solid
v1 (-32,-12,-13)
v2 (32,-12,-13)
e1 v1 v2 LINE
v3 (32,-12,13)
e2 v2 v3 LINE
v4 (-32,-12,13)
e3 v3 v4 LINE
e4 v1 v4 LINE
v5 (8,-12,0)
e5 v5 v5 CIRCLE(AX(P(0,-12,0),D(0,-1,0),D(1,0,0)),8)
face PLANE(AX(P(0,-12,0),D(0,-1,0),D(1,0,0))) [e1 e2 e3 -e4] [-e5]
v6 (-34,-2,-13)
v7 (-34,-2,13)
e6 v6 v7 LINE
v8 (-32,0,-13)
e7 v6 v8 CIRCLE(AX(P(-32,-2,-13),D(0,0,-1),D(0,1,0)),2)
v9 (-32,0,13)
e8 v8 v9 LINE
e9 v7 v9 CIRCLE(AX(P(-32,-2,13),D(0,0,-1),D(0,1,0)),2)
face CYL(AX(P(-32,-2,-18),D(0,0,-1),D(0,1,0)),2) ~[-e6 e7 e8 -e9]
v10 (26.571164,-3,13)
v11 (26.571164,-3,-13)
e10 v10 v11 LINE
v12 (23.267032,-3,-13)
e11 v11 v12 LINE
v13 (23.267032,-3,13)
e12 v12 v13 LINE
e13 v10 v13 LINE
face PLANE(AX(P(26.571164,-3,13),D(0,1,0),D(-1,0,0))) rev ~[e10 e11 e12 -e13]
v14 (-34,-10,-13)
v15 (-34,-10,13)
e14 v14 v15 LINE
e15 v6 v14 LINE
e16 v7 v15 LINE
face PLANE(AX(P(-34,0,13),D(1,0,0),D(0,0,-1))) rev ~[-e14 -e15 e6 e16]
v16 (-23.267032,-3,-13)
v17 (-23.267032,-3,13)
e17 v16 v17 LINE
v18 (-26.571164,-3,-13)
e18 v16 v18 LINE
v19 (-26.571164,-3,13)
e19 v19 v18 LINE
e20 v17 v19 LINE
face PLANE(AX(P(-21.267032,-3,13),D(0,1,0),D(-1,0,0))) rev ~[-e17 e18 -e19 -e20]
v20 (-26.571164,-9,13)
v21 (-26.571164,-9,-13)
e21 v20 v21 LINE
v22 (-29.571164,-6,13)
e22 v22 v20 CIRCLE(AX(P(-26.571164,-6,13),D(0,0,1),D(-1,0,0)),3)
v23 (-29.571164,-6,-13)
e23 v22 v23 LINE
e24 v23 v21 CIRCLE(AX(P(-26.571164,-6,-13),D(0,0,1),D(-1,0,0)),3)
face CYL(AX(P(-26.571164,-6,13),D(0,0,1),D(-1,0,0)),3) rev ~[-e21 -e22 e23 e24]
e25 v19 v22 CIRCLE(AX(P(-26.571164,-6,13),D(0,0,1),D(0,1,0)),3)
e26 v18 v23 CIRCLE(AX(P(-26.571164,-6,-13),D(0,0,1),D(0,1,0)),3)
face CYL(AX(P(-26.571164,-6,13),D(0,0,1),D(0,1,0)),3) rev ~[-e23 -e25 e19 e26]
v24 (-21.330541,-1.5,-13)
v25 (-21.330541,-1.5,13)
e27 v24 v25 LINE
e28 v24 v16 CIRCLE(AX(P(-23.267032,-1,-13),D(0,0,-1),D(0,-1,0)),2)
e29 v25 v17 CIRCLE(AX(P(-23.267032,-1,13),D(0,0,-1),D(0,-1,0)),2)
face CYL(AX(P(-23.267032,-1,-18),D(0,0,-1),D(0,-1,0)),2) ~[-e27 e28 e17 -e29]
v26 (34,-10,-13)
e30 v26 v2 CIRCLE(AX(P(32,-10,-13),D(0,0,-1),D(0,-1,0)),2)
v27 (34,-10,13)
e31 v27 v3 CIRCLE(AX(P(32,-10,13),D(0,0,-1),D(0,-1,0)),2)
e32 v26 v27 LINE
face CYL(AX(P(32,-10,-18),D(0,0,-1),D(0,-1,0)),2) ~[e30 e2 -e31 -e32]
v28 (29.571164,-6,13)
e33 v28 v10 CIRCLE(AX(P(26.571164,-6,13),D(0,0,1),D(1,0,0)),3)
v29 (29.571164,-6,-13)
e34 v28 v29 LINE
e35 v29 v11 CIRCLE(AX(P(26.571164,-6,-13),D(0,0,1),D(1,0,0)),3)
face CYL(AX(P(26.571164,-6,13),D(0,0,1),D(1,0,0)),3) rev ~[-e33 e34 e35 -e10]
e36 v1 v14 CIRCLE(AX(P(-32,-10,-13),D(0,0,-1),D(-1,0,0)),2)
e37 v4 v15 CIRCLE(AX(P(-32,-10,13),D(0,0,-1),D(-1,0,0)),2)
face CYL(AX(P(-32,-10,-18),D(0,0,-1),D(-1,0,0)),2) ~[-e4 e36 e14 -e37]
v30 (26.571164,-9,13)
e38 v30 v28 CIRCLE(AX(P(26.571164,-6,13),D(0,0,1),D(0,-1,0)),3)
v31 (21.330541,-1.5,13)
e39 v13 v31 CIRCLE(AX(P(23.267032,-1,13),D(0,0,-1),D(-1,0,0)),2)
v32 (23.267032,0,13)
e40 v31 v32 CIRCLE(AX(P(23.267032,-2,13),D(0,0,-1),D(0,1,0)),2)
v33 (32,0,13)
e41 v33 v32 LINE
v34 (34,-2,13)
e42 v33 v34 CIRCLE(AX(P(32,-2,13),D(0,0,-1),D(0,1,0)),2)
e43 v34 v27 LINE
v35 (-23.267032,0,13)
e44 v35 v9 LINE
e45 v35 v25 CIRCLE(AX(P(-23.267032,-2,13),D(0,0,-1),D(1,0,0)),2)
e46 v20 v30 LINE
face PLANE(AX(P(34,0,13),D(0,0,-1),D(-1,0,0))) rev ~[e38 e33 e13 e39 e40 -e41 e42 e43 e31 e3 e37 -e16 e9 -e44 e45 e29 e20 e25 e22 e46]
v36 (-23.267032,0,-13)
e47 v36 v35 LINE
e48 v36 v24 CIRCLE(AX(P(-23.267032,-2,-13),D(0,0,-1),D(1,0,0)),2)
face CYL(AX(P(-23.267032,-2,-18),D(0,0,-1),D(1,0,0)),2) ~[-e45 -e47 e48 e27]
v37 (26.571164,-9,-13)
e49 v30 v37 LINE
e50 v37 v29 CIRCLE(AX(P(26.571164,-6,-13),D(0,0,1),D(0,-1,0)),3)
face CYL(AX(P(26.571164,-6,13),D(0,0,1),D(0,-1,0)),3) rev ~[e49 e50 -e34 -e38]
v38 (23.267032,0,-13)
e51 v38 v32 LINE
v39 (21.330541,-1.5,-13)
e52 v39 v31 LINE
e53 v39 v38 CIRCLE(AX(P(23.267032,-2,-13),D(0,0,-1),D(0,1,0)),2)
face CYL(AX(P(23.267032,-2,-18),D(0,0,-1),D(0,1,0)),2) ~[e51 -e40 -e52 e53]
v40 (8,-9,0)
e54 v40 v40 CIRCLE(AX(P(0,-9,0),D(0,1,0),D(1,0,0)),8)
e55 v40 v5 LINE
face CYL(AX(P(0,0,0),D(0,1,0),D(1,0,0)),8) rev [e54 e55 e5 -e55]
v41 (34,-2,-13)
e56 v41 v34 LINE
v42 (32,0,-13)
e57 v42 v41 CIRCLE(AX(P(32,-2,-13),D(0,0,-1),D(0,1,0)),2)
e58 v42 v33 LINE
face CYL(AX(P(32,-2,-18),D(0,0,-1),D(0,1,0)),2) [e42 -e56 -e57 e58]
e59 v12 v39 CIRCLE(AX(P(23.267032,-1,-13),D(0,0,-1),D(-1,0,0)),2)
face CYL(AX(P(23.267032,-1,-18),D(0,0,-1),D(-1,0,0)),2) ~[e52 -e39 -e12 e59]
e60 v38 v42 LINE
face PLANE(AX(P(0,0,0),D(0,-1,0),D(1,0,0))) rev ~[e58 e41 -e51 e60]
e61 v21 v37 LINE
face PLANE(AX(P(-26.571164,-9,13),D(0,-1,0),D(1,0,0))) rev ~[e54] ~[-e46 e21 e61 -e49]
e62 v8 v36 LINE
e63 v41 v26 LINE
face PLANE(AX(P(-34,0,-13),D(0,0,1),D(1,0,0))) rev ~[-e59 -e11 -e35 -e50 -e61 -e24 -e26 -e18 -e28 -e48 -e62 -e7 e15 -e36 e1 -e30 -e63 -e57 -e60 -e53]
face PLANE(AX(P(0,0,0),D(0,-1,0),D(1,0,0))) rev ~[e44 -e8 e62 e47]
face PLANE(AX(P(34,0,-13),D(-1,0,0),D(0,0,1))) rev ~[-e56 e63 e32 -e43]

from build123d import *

# Parameters (mm, degrees)
F0_R        = 8
F1_DEPTH    = 12
F3_DEPTH    = 40
F4_T1_DEPTH = 36


# Not quite as in the source:
# - a fillet or chamfer that OpenCascade refuses, or shapes differently, is made with other operations: its cross-section is extruded or revolved along the edge and cut away or added
# - a feature names something its author has since deleted; it is built from what else it names


with BuildPart() as f1:
    # F0 (on Front) → F1 (new body)
    with BuildSketch(Plane.XZ):
        Polygon((34, 13), (-34, 13), (-34, 0), (-34, -13), (34, -13), align=None)
        Circle(F0_R, mode=Mode.SUBTRACT)
    extrude(amount=F1_DEPTH)

    # F2 (on face) → F3 (cut)
    with BuildSketch(Plane.XY.offset(13)):
        with BuildLine():
            Line((-21.2670322508, -3), (-26.5711637536, -3))
            ThreePointArc((-26.5711637536, -3), (-28.6924840972, -3.8786796564), (-29.5711637536, -6))
            ThreePointArc((-29.5711637536, -6), (-28.6924840972, -8.1213203436), (-26.5711637536, -9))
            Line((-26.5711637536, -9), (26.5711637536, -9))
            ThreePointArc((26.5711637536, -9), (28.6924840972, -8.1213203436), (29.5711637536, -6))
            ThreePointArc((29.5711637536, -6), (28.6924840972, -3.8786796564), (26.5711637536, -3))
            Line((26.5711637536, -3), (21.2670322508, -3))
            Line((21.2670322508, -3), (21.2670322508, 0))
            Line((21.2670322508, 0), (0, 0))
            Line((0, 0), (-21.2670322508, 0))
            Line((-21.2670322508, 0), (-21.2670322508, -3))
        make_face()
    extrude(amount=-F3_DEPTH, mode=Mode.SUBTRACT)

    # F4: fillet of radius 2 on 8 edges, made by hand

    # F4_s2 → F4_t1 (cut)
    with BuildSketch(Plane.XY.offset(-18)):
        with BuildLine():
            ThreePointArc((32, -12), (33.4142135624, -11.4142135624), (34, -10))
            Line((34, -10), (34, -12))
            Line((34, -12), (32, -12))
        make_face()
        with BuildLine():
            ThreePointArc((32, 0), (33.4142135624, -0.5857864376), (34, -2))
            Line((34, -2), (34, 0))
            Line((34, 0), (32, 0))
        make_face()
        with BuildLine():
            ThreePointArc((-21.2670322508, -2), (-21.8528186884, -0.5857864376), (-23.2670322508, 0))
            Line((-23.2670322508, 0), (-21.2670322508, 0))
            Line((-21.2670322508, 0), (-21.2670322508, -2))
        make_face()
        with BuildLine():
            ThreePointArc((23.2670322508, 0), (21.8528186884, -0.5857864376), (21.2670322508, -2))
            Line((21.2670322508, -2), (21.2670322508, 0))
            Line((21.2670322508, 0), (23.2670322508, 0))
        make_face()
        with BuildLine():
            ThreePointArc((-32, 0), (-33.4142135624, -0.5857864376), (-34, -2))
            Line((-34, -2), (-34, 0))
            Line((-34, 0), (-32, 0))
        make_face()
        with BuildLine():
            ThreePointArc((-34, -10), (-33.4142135624, -11.4142135624), (-32, -12))
            Line((-32, -12), (-34, -12))
            Line((-34, -12), (-34, -10))
        make_face()
        with BuildLine():
            ThreePointArc((-23.2670322508, -3), (-21.8528186884, -2.4142135624), (-21.2670322508, -1))
            Line((-21.2670322508, -1), (-21.2670322508, -3))
            Line((-21.2670322508, -3), (-23.2670322508, -3))
        make_face()
        with BuildLine():
            ThreePointArc((21.2670322508, -1), (21.8528186884, -2.4142135624), (23.2670322508, -3))
            Line((23.2670322508, -3), (21.2670322508, -3))
            Line((21.2670322508, -3), (21.2670322508, -1))
        make_face()
    extrude(amount=F4_T1_DEPTH, mode=Mode.SUBTRACT)


solid = f1.part
